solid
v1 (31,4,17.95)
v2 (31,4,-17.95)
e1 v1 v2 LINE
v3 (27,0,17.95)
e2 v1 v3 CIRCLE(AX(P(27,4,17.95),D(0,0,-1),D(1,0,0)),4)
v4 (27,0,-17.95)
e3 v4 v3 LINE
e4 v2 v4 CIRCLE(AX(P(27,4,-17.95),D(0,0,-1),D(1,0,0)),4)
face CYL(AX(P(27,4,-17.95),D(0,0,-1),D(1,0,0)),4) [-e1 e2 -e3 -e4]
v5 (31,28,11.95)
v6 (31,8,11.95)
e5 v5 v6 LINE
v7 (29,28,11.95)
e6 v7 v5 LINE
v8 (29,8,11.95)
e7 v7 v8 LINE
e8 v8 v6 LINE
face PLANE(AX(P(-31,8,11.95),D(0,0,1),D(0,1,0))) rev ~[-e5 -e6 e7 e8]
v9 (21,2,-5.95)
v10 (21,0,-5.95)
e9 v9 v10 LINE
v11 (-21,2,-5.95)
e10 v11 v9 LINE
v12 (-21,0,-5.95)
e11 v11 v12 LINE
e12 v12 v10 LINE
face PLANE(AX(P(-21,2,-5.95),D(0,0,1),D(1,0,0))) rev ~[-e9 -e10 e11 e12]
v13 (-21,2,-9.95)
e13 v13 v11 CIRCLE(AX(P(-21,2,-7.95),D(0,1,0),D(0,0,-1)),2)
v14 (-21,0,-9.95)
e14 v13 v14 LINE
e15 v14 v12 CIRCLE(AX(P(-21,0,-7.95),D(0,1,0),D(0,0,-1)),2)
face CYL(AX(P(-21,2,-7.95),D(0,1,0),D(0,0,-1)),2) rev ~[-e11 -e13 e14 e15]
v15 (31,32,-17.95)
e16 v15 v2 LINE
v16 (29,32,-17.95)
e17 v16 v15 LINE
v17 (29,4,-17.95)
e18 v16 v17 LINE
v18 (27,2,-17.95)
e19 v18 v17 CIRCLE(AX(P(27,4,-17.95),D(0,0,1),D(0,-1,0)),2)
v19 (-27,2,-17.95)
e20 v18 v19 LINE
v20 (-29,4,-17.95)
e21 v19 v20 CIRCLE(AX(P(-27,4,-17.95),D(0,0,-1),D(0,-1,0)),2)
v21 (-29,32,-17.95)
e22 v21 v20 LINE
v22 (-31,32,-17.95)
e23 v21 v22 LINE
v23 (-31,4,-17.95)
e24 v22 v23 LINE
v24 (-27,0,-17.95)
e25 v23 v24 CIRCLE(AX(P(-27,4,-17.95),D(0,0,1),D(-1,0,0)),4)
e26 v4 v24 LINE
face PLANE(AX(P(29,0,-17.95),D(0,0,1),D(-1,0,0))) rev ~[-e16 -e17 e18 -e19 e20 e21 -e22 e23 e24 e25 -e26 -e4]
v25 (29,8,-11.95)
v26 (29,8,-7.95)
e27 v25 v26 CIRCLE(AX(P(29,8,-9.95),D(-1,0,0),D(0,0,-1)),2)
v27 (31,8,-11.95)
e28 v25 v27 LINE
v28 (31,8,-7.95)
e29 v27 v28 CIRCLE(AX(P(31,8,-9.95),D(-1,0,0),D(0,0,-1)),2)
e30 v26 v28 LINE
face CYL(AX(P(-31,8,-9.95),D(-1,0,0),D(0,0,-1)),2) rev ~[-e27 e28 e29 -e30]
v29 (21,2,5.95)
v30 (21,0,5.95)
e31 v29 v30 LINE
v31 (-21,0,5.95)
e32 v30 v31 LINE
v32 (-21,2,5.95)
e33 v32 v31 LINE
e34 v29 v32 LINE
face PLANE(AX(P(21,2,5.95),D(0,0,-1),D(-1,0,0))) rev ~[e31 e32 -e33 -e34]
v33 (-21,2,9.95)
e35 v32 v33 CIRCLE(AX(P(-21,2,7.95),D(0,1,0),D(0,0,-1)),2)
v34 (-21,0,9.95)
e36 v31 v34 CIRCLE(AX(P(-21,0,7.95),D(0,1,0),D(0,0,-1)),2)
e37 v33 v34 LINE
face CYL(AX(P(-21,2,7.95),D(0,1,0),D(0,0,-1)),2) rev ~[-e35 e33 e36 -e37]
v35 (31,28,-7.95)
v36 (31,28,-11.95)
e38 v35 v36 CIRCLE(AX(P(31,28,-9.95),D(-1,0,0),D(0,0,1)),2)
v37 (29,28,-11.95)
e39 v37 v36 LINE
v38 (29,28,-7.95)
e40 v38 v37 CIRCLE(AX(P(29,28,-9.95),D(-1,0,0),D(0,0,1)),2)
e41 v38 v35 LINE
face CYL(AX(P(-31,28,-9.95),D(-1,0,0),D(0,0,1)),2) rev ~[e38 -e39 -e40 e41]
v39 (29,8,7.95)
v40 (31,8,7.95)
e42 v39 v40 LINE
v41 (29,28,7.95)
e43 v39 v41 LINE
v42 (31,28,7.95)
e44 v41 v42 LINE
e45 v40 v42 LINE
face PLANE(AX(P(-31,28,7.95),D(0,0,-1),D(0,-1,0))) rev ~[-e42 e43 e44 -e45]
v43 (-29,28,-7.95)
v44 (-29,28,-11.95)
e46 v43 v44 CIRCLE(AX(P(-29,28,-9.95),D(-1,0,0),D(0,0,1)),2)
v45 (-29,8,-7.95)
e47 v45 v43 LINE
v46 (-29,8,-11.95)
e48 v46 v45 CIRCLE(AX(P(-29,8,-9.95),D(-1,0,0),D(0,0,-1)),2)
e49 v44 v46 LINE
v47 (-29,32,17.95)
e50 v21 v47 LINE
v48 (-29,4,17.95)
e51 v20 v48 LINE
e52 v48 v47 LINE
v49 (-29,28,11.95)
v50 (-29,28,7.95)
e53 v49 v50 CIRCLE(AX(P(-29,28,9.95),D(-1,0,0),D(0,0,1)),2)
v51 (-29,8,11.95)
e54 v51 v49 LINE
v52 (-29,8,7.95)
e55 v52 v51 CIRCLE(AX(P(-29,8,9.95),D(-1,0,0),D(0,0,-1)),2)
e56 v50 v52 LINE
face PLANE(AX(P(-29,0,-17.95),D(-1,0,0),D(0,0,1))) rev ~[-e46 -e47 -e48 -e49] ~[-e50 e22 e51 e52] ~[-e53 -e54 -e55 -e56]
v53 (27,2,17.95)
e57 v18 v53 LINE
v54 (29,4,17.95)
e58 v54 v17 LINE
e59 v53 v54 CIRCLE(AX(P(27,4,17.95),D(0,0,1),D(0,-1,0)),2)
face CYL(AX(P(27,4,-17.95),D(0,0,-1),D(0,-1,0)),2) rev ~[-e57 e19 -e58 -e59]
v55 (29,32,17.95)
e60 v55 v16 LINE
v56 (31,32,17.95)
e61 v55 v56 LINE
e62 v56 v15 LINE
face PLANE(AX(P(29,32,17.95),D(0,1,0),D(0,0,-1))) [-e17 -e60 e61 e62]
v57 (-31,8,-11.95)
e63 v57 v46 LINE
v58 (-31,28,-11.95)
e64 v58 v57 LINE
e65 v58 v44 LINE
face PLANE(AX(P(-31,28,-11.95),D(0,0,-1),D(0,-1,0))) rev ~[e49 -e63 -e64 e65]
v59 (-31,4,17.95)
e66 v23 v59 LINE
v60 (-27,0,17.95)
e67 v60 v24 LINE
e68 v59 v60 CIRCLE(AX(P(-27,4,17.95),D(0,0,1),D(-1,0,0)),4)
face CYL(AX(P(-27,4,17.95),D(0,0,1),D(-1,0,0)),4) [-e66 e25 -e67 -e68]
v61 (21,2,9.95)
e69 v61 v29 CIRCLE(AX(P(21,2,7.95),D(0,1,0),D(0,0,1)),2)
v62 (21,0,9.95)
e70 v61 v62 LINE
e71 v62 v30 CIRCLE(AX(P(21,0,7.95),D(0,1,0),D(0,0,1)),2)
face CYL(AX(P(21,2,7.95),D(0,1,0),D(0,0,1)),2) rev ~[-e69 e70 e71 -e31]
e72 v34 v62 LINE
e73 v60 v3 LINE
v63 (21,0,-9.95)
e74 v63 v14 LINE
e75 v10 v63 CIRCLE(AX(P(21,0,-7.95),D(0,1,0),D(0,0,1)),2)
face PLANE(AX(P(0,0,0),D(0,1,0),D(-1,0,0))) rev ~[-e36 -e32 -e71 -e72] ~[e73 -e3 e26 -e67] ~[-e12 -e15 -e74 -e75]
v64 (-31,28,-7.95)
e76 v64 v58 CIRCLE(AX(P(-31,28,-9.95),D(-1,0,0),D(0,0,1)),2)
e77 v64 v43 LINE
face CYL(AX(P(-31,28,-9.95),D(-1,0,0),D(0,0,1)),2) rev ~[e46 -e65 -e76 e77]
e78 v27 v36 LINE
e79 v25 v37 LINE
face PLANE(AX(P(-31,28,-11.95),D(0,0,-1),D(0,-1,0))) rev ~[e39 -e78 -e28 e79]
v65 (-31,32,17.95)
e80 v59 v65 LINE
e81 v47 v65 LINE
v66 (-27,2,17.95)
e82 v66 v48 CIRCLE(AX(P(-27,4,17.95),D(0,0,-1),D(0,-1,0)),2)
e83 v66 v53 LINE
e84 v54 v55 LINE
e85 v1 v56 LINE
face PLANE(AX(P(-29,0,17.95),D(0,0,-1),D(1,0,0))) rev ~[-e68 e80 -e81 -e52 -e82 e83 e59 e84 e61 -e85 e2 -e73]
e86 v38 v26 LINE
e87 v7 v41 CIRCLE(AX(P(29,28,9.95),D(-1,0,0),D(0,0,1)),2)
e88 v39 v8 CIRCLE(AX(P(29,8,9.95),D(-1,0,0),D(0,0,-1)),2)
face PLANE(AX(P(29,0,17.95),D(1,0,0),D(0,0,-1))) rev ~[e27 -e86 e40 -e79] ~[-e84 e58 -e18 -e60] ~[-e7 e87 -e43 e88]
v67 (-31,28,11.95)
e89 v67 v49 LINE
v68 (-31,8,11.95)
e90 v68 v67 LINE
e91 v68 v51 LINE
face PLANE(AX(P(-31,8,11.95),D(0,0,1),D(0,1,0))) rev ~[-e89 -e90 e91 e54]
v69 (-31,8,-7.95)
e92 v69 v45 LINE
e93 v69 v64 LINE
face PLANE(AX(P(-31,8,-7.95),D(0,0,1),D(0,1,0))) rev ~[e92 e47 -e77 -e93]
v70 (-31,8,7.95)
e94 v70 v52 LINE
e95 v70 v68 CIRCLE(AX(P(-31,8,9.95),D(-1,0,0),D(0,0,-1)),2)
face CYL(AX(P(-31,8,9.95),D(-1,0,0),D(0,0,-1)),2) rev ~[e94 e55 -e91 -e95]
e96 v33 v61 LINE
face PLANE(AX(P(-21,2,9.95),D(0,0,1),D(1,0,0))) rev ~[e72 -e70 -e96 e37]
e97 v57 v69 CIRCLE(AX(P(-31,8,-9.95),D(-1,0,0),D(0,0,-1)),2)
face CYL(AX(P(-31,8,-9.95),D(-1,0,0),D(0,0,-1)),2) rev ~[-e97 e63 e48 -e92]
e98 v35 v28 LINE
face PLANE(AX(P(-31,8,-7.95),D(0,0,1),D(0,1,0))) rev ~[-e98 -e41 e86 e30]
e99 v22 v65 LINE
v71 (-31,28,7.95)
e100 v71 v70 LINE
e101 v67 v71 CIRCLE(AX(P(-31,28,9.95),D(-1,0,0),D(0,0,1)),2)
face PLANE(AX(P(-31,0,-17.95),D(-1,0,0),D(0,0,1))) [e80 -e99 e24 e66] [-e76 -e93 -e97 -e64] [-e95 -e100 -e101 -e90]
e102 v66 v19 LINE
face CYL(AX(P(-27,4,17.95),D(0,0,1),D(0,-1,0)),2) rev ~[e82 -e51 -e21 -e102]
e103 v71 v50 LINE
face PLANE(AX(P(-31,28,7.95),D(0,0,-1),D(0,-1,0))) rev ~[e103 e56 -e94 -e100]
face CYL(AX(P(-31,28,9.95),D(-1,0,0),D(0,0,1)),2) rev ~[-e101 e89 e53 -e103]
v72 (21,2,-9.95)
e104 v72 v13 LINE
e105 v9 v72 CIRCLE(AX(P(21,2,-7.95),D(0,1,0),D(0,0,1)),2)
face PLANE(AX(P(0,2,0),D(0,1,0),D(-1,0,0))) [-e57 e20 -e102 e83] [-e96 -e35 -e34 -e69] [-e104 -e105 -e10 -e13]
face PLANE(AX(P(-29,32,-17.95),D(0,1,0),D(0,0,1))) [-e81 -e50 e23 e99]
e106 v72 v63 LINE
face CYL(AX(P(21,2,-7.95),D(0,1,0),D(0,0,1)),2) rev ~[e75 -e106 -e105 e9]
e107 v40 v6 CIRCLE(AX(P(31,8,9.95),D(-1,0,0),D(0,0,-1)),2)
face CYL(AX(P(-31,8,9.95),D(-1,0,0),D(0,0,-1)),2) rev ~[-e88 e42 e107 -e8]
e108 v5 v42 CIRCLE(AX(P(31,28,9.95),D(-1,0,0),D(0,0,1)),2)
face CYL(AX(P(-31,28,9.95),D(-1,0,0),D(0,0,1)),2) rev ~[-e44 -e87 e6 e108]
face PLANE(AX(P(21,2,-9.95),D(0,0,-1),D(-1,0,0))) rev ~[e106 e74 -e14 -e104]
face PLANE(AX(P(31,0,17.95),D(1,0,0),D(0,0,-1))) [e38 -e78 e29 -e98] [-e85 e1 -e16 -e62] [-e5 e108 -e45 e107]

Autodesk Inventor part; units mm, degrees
ref_plane "YZ Plane" through (0, 0, 0) normal (1, 0, 0) x (0, 1, 0)
ref_plane "XZ Plane" through (0, 0, 0) normal (0, 1, 0) x (-1, 0, 0)
ref_plane "XY Plane" through (0, 0, 0) normal (0, 0, 1) x (1, 0, 0)
sketch "スケッチ1" plane through (0, 0, 0) normal (0, 1, 0) x (-1, 0, 0)
  line L0 (-29, -17.95) -> (29, -17.95)
  line L1 (29, -17.95) -> (29, 17.95)
  line L2 (29, 17.95) -> (-29, 17.95)
  line L3 (-29, 17.95) -> (-29, -17.95)
  line L4 (-29, -17.95) -> (29, 17.95) construction
  line L5 (29, -17.95) -> (-29, 17.95) construction
  point P0 (0, 0)
  dimension "d0" = 35.9
  dimension "d1" = 58
extrude "プレート1" add sketch "スケッチ1" along normal blind 2
sketch "スケッチ2" plane through (29, 0, 17.95) normal (1, 0, 0) x (0, 0, -1)
  line L0 (0, 2) -> (35.9, 2)
  line L1 (35.9, 2) -> (0, 2)
  line L2 (0, 2) -> (0, 32)
  line L3 (0, 32) -> (35.9, 32)
  line L4 (35.9, 32) -> (35.9, 2)
  point P0 (17.95, 0)
  dimension "d3" = 30
sheet face with bend "面2" sketch "スケッチ2" thickness 2 toward (1, 0, 0) bend radius 2
bend "曲げ1"
sketch "スケッチ3" plane through (-29, 0, -17.95) normal (-1, 0, 0) x (0, 0, 1)
  line L0 (0, 0) -> (0, 2)
  line L1 (0, 32) -> (35.9, 32)
  line L2 (0, 2) -> (35.9, 2)
  line L3 (35.9, 2) -> (35.9, 32)
  line L4 (35.9, 32) -> (0, 32)
  line L5 (0, 32) -> (0, 2)
  point P0 (17.95, 0)
sheet face with bend "面3" sketch "スケッチ3" thickness 2 toward (-1, 0, 0) bend radius 2
bend "曲げ2"
sketch "スケッチ4" plane through (-31, 0, -17.95) normal (-1, 0, 0) x (0, 0, 1)
  line L0 (6, 28) -> (6, 8)
  arc A0 (6, 8) -> (10, 8) centre (8, 8) ccw
  line L1 (10, 8) -> (10, 28)
  arc A1 (10, 28) -> (6, 28) centre (8, 28) ccw
  line L2 (0, 32) -> (35.9, 32) projected
  line L3 (35.9, 4) -> (0, 4) projected
  line L4 (0, 4) -> (0, 32) projected
  line L5 (25.9, 28) -> (25.9, 8)
  arc A2 (25.9, 8) -> (29.9, 8) centre (27.9, 8) ccw
  line L6 (29.9, 8) -> (29.9, 28)
  arc A3 (29.9, 28) -> (25.9, 28) centre (27.9, 28) ccw
  line L7 (35.9, 32) -> (35.9, 4) projected
  point P0 (17.95, 0)
  dimension "d14" = 2
  dimension "d15" = 4
  dimension "d16" = 4
  dimension "d17" = 6
  dimension "d18" = 2
  dimension "d19" = 6
extrude "押し出し1" cut sketch "スケッチ4" against normal blind 100 contours A1 L1 A0 L0 | A3 L6 A2 L5
sketch "スケッチ5" plane through (0, 2, 0) normal (0, 1, 0) x (1, 0, 0)
  line L0 (-21, -9.95) -> (21, -9.95)
  arc A0 (21, -9.95) -> (21, -5.95) centre (21, -7.95) ccw
  line L1 (21, -5.95) -> (-21, -5.95)
  arc A1 (-21, -5.95) -> (-21, -9.95) centre (-21, -7.95) ccw
  line L2 (-21, 5.95) -> (21, 5.95)
  arc A2 (21, 5.95) -> (21, 9.95) centre (21, 7.95) ccw
  line L3 (21, 9.95) -> (-21, 9.95)
  arc A3 (-21, 9.95) -> (-21, 5.95) centre (-21, 7.95) ccw
  line L4 (-27, 17.95) -> (27, 17.95) projected
  line L5 (27, -17.95) -> (-27, -17.95) projected
  line L6 (-27, 17.95) -> (-27, -17.95) projected
  line L7 (27, -17.95) -> (27, 17.95) projected
  point P0 (0, 0)
  dimension "d22" = 2
  dimension "d23" = 2
  dimension "d25" = 10
  dimension "d26" = 10
  dimension "d27" = 6
  dimension "d28" = 6
  dimension "d29" = 6
  dimension "d30" = 6
extrude "押し出し2" cut sketch "スケッチ5" against normal blind 3 contours A1 L1 A0 L0 | A3 L3 A2 L2
equation "\"d2\" = Thickness"
equation "\"d4\" = BendRadius"
equation "\"d5\" = BendReliefWidth"
equation "\"d7\" = MinimumRemnant"
equation "\"d6\" = BendReliefDepth"
equation "\"d8\" = TransitionRadius"
equation "\"d9\" = BendRadius"
equation "\"d10\" = BendReliefWidth"
equation "\"d12\" = MinimumRemnant"
equation "\"d11\" = BendReliefDepth"
equation "\"d13\" = TransitionRadius"
equation "\"BendRadius\" = Thickness"
equation "\"BendReliefWidth\" = Thickness"
equation "\"BendReliefDepth\" = 0.5 * Thickness"
equation "\"CornerReliefSize\" = 4 * Thickness"
equation "\"MinimumRemnant\" = 2 * Thickness"
equation "\"TransitionRadius\" = BendRadius"
equation "\"JacobiRadiusSize\" = BendRadius"
equation "\"GapSize\" = Thickness"
equation "\"Thickness\" = 2"
properties part number "trackball_cup" material "アルミニウム 6061"
